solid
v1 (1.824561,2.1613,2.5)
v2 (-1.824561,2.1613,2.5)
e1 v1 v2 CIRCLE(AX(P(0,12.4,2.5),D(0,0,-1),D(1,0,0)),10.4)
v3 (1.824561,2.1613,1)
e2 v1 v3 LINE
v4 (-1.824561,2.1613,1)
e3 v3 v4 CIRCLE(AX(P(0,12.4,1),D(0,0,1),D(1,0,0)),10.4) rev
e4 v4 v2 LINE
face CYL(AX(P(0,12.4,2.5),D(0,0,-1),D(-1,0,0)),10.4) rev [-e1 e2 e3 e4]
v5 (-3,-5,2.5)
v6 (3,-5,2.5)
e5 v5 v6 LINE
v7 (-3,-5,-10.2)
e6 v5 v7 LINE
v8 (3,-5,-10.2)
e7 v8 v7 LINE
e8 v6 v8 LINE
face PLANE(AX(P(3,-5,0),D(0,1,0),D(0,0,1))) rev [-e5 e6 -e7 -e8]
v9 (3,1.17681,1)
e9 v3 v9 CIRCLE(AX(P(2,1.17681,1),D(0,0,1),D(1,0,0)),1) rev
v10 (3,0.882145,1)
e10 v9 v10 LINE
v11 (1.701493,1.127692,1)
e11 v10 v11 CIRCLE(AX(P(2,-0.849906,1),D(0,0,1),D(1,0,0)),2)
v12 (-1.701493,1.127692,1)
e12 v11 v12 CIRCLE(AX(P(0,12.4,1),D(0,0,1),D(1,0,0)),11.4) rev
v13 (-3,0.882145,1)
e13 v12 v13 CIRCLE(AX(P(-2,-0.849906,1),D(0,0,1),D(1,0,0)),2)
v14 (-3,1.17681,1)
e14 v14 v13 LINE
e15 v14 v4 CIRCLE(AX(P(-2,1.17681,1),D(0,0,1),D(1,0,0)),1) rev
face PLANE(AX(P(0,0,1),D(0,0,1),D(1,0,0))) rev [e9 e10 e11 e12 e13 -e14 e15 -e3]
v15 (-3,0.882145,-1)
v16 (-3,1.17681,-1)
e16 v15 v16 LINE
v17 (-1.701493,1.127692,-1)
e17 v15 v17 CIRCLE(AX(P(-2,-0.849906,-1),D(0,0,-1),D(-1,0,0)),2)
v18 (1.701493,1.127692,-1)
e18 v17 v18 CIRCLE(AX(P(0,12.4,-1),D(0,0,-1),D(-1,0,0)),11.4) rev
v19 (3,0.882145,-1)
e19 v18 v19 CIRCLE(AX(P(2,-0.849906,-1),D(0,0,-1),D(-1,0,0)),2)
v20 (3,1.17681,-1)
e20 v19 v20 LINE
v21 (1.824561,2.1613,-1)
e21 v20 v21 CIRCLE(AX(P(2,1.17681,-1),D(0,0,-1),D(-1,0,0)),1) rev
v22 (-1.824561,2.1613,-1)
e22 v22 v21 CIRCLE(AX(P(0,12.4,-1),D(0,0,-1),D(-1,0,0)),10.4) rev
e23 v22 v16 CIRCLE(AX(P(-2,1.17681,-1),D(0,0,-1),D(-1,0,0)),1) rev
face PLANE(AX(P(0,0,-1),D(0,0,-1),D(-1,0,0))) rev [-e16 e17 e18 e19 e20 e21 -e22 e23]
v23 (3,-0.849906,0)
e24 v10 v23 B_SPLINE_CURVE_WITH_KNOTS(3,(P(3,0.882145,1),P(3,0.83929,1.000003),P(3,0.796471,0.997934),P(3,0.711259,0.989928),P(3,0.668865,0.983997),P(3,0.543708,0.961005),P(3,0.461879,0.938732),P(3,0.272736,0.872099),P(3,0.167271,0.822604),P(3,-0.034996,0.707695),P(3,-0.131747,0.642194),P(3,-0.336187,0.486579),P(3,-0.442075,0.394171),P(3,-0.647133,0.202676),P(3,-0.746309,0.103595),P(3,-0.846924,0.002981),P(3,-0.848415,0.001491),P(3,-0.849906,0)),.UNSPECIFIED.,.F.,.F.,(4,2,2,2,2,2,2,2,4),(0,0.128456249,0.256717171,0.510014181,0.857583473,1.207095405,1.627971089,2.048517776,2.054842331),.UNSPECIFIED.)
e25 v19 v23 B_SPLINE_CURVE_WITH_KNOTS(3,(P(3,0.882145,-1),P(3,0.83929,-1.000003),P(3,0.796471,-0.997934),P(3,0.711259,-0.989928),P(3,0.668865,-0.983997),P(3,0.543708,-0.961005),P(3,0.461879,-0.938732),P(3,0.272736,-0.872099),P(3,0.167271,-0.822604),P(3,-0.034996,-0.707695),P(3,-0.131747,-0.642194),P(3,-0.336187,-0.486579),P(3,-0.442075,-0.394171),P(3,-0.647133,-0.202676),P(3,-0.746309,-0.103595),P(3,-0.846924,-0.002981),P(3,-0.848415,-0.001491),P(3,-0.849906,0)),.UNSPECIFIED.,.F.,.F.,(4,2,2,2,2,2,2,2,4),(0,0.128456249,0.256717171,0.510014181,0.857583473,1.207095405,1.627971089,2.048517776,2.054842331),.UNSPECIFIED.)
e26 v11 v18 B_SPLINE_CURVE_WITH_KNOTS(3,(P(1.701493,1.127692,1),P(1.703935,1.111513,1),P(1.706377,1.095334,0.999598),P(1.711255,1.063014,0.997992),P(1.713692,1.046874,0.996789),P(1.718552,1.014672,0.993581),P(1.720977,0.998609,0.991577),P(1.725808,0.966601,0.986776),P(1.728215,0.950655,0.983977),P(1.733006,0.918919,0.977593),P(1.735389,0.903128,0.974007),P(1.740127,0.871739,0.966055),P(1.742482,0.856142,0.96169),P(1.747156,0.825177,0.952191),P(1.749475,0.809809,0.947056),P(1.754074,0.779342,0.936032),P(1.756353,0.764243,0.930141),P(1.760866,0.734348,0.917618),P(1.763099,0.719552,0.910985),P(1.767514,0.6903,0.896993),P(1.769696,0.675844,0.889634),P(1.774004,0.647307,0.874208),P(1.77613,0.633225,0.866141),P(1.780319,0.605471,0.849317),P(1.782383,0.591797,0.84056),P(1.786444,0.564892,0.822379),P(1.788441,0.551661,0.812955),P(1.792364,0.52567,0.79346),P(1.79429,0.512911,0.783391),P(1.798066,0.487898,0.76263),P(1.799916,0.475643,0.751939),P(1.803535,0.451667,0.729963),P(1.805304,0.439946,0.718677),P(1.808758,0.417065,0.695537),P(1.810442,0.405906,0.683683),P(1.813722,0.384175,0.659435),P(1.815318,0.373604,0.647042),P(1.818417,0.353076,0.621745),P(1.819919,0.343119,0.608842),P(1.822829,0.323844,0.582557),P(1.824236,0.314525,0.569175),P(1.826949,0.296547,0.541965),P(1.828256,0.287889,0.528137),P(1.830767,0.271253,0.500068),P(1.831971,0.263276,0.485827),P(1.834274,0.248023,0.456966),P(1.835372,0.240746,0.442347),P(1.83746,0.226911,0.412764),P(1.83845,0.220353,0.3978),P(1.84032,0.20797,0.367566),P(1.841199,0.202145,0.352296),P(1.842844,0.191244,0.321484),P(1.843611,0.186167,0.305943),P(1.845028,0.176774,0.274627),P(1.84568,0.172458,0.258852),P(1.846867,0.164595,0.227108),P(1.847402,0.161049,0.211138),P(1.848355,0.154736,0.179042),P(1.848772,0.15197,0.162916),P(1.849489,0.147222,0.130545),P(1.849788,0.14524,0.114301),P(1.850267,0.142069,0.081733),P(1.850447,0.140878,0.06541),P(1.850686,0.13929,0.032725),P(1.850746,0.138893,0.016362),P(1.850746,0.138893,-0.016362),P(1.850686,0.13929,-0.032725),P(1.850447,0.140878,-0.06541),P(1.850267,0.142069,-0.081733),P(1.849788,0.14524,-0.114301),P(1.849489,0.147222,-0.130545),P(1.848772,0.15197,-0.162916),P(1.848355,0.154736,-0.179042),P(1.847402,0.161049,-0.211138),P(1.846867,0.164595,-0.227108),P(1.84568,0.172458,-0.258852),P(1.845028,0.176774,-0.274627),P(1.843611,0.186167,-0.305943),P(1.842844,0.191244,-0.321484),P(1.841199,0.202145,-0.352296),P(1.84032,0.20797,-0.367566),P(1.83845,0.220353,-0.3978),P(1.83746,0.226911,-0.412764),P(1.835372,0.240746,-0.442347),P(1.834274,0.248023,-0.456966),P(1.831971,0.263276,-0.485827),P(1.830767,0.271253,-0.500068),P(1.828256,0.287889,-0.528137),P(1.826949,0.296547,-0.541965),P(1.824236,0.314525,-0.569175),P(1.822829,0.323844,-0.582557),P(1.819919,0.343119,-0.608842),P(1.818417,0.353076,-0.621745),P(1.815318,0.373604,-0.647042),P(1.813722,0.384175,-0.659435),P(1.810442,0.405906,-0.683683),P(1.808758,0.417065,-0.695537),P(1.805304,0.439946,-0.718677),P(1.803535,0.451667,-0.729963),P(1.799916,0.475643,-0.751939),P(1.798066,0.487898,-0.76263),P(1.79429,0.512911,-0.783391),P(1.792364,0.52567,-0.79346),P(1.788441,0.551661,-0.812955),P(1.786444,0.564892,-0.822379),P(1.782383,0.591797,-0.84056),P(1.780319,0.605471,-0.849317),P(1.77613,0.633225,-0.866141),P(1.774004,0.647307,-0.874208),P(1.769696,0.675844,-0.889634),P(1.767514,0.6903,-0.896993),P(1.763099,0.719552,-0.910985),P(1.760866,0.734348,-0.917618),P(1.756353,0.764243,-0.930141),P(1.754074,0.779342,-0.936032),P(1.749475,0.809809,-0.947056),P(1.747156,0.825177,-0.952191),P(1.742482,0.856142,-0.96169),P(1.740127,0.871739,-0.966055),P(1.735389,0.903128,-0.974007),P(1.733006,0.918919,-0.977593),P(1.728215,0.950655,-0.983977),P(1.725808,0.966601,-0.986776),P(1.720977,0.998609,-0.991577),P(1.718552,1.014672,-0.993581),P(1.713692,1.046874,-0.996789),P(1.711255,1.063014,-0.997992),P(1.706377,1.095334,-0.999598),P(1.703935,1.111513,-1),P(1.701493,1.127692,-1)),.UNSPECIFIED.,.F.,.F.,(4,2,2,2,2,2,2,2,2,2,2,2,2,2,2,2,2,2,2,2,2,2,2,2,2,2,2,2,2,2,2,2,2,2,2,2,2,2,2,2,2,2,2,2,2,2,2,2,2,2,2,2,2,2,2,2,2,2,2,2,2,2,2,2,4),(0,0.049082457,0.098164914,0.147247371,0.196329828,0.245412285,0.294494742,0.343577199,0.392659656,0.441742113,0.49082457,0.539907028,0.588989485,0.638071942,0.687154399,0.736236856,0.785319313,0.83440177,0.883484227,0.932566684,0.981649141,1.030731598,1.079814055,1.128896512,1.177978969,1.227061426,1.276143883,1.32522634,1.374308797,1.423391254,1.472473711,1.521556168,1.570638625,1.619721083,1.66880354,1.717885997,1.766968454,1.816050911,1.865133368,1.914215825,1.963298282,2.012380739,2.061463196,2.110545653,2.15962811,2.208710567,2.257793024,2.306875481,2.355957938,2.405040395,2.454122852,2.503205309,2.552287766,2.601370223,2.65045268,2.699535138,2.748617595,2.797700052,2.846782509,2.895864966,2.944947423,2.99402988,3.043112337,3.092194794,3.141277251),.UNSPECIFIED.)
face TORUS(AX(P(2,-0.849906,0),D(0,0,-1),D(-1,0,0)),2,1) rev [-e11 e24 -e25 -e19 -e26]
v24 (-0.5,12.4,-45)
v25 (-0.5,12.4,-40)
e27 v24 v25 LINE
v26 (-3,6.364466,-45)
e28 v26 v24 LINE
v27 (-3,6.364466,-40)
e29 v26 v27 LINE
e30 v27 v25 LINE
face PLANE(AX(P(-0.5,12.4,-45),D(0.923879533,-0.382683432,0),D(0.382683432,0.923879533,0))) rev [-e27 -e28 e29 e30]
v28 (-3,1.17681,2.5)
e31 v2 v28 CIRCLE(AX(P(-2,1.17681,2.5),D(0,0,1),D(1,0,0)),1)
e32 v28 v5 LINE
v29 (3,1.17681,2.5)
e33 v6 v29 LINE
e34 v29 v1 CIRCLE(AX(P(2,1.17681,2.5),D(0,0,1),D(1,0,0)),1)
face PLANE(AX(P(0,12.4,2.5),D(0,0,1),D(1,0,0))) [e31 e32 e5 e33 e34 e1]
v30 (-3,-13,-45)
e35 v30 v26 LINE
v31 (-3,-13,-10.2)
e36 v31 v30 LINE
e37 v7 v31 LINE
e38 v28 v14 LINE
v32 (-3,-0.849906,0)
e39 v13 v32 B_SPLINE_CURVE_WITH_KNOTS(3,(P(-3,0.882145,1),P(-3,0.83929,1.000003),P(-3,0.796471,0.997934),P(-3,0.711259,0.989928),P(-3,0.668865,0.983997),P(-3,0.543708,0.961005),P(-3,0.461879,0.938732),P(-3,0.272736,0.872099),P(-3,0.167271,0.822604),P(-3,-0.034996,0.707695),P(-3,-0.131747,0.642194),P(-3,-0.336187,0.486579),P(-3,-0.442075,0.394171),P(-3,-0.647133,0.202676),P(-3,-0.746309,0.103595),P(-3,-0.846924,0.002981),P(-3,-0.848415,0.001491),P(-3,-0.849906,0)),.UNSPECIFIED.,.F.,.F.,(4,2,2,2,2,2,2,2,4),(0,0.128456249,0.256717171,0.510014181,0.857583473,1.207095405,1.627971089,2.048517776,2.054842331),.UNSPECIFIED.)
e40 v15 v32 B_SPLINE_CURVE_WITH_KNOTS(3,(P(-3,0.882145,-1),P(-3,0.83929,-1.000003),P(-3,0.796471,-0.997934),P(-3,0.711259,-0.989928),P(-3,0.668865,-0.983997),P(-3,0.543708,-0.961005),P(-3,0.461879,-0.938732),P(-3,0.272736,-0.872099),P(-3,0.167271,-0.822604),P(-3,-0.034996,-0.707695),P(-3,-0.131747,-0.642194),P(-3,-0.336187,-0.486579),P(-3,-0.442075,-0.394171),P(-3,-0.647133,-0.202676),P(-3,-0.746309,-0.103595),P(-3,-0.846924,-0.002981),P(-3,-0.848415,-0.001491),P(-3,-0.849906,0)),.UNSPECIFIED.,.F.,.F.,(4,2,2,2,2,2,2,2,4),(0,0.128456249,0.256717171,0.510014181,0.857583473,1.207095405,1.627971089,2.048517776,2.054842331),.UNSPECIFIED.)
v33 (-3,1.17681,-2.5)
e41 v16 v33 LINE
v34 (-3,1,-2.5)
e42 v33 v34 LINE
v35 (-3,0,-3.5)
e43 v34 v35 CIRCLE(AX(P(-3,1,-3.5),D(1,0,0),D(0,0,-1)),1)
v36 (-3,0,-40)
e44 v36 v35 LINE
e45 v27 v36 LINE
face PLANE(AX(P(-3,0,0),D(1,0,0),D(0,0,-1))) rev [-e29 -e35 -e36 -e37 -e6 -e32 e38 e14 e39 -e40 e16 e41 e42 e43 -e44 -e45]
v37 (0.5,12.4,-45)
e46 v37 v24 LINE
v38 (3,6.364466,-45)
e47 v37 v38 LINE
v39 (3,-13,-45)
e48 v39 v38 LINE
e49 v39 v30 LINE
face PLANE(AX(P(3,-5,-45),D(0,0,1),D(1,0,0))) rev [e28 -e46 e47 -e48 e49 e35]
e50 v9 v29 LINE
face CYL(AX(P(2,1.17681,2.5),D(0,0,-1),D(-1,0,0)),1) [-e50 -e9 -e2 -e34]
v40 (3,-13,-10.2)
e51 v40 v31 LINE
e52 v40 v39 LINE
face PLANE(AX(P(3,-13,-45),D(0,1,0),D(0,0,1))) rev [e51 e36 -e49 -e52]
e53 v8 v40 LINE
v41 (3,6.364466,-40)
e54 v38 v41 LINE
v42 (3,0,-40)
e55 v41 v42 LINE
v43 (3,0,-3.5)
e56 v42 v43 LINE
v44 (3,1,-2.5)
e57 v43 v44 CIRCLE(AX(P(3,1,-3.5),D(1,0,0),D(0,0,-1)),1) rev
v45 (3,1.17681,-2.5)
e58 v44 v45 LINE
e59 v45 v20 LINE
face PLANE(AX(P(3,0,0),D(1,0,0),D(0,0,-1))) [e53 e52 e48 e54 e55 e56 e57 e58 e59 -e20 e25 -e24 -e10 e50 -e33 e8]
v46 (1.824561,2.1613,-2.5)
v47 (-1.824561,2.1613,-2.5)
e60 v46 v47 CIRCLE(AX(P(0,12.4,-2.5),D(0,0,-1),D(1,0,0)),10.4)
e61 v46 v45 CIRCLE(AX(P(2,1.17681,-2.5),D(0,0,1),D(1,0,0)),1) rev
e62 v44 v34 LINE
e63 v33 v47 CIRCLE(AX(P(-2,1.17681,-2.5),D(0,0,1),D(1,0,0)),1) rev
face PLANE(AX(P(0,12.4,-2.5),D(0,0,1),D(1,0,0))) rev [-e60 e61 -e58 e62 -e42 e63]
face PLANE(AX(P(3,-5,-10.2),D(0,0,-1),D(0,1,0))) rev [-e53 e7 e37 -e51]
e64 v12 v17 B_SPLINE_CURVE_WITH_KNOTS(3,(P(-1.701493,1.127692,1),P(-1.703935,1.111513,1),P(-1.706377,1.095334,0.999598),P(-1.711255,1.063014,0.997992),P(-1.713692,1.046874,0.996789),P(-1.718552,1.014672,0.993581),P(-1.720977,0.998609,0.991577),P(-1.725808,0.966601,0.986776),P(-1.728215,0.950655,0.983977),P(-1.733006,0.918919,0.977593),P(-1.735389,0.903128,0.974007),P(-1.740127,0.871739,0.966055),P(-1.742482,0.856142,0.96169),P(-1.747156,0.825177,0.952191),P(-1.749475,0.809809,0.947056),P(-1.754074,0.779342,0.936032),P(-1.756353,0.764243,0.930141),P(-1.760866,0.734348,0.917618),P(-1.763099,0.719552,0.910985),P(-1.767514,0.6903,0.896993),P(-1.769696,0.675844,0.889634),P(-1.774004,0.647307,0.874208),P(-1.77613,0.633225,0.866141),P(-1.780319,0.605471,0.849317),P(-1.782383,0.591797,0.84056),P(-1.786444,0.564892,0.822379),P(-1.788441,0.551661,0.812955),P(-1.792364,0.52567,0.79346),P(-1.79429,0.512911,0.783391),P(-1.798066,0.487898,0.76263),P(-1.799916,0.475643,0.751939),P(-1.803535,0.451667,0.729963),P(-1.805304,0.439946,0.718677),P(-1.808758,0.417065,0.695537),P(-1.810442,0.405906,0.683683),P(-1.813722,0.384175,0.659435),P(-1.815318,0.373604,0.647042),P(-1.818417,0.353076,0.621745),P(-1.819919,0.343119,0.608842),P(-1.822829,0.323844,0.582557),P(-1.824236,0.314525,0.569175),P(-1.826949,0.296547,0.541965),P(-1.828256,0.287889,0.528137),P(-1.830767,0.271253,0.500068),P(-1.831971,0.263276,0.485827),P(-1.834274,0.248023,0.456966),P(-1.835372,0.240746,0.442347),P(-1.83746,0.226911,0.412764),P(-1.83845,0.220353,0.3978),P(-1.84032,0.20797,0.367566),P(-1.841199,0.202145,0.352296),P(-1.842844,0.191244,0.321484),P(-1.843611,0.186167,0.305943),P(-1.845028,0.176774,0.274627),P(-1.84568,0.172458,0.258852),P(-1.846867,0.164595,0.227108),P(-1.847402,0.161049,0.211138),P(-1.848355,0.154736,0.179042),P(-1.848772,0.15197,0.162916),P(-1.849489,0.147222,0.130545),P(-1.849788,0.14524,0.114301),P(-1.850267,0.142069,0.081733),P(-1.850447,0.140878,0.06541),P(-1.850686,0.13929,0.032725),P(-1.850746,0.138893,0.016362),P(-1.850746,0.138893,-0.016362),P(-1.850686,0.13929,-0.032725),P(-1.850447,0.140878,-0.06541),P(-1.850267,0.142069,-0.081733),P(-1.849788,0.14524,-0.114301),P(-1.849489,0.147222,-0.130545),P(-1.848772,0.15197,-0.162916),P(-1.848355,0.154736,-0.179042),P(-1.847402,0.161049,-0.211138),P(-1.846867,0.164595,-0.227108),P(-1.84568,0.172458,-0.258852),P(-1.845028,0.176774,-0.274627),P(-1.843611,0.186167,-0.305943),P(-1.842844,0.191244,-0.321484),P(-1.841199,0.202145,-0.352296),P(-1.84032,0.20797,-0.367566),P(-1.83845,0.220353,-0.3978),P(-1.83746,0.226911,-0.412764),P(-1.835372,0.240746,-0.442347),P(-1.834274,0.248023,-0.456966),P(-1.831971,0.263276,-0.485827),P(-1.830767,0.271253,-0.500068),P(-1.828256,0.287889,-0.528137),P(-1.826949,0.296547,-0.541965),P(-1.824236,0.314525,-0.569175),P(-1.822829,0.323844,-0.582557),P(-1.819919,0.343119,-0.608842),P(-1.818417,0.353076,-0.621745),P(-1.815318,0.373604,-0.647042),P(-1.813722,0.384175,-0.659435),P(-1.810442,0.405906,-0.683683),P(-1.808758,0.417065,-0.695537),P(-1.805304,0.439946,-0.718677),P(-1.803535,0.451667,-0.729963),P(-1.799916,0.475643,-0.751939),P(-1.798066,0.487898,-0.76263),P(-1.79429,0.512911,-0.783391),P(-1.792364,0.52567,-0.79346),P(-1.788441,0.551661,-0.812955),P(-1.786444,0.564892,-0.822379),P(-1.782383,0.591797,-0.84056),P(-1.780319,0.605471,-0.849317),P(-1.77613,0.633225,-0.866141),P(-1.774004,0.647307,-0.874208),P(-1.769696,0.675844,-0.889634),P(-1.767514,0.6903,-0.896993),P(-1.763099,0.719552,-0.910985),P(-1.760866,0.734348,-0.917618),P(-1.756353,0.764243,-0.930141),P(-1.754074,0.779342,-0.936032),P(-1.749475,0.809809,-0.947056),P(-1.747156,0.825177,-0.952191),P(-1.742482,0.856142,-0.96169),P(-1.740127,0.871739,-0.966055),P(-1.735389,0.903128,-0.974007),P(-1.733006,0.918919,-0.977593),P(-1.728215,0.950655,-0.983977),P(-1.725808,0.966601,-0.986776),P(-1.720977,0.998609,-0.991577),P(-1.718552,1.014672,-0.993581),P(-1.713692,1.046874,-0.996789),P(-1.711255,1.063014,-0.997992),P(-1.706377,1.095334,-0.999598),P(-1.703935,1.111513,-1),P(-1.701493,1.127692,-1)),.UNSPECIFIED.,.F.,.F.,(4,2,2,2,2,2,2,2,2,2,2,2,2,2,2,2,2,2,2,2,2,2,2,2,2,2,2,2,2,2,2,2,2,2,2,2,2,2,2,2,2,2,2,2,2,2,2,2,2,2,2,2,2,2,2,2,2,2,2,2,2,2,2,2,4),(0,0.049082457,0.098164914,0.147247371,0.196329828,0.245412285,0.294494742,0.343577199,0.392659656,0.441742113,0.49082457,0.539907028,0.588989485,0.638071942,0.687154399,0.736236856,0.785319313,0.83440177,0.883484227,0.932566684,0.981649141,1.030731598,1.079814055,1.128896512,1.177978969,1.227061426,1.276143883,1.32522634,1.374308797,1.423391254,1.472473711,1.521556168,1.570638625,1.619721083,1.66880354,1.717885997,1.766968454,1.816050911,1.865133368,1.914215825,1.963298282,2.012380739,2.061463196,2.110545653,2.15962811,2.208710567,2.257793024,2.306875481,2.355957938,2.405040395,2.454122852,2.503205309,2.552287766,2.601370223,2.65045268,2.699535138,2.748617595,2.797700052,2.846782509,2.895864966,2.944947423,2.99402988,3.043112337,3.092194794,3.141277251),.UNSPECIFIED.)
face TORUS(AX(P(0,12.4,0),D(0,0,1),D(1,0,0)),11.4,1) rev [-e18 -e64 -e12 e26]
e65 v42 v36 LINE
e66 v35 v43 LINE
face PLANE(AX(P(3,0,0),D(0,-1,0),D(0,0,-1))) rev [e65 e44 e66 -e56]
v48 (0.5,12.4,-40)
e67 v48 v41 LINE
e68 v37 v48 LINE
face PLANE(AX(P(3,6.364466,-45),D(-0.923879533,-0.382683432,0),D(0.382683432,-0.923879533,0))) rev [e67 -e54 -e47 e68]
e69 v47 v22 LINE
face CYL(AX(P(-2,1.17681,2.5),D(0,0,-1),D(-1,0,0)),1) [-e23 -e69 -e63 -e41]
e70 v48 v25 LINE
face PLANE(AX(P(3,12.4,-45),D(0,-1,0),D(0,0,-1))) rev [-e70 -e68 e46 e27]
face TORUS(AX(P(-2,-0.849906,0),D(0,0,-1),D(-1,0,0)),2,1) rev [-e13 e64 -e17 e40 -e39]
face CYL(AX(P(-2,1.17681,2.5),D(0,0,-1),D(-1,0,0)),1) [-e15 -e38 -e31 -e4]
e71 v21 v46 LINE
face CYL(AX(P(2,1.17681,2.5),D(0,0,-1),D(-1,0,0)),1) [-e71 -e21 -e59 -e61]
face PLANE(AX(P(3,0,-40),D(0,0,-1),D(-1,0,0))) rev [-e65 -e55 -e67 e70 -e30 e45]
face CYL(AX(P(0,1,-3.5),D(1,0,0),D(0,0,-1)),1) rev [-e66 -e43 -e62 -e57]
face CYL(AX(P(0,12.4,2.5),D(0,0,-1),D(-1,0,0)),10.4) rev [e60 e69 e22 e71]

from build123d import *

# Parameters (mm, degrees)
BOSS_EXTRUDE1_DEPTH = 3
BOSS_EXTRUDE2_DEPTH = 2.5
SKETCH4_W           = 2
SKETCH4_H           = 2.442088572
FILLET1_R           = 1
FILLET2_R           = 1
CUT_EXTRUDE2_DEPTH  = 5
SKETCH6_W           = 34.8
SKETCH6_H           = 8
BOSS_EXTRUDE3_DEPTH = 3


with BuildPart() as part:
    # Sketch2 → Boss-Extrude1 (new, symmetric)
    with BuildSketch(Plane(origin=(0, 0, 0), x_dir=(0, 0, -1), z_dir=(1, 0, 0))):
        Polygon((0, 0), (40, 0), (40, 12.4), (45, 12.4), (45, -5), (0, -5), align=None)
    extrude(amount=BOSS_EXTRUDE1_DEPTH, both=True)

    # Sketch3 → Boss-Extrude2 (add, symmetric)
    with BuildSketch(Plane.XY):
        with BuildLine():
            Line((-3, 2.442088572), (-3, -5))
            Line((-3, -5), (3, -5))
            Line((3, -5), (3, 2.442088572))
            ThreePointArc((3, 2.442088572), (0, 2), (-3, 2.442088572))
        make_face()
    extrude(amount=BOSS_EXTRUDE2_DEPTH, both=True)

    # Sketch4 → Cut-Revolve1 (revolve, cut)
    with BuildSketch(Plane(origin=(0, 0, 0), x_dir=(0, 0, -1), z_dir=(1, 0, 0))):
        with Locations((0, 1.221044286)):
            Rectangle(SKETCH4_W, SKETCH4_H)
    revolve(axis=Axis((0, 12.4, 0), (0, 0, -1)), mode=Mode.SUBTRACT)

    # Fillet1
    fillet1_edges = [part.edges().sort_by_distance(p)[0] for p in [
        (-3, 2.442088572, 1.75),
        (0, 0, -2.5),
        (3, 2.442088572, 1.75),
        (-3, 2.442088572, -1.75),
        (3, 2.442088572, -1.75),
        (-3, 0.368375006, 0),
        (3, 0.368375006, 0),
    ]]
    fillet(fillet1_edges, radius=FILLET1_R)

    # Fillet2
    # the kernel refuses this fillet: 1 mm, written as the material it adds along each edge
    with BuildSketch(Plane(origin=(0, 12.4, -1), x_dir=(-0.14925373134328332, -0.9887989298538439, 0), z_dir=(-0.9887989298538439, 0.14925373134328332, 0))) as fillet2_piece_1:
        with BuildLine():
            CenterArc((12.4 - FILLET2_R, FILLET2_R), FILLET2_R, 270, 90)
            Line((12.4 - FILLET2_R, 0), (12.4, 0))
            Line((12.4, 0), (12.4, FILLET2_R))
        make_face()
    revolve(axis=Axis((0, 12.4, -1), (0, 0, 1)), revolution_arc=17.167363371)
    with BuildSketch(Plane(origin=(0, 12.4, 1), x_dir=(-0.14925373134328332, -0.9887989298538439, 0), z_dir=(-0.9887989298538439, 0.14925373134328332, 0))) as fillet2_piece_2:
        with BuildLine():
            CenterArc((12.4 - FILLET2_R, -FILLET2_R), FILLET2_R, 0, 90)
            Line((12.4 - FILLET2_R, 0), (12.4, 0))
            Line((12.4, 0), (12.4, -FILLET2_R))
        make_face()
    revolve(axis=Axis((0, 12.4, 1), (0, 0, 1)), revolution_arc=17.167363371)
    with BuildSketch(Plane(origin=(2, -0.84990566, -1), x_dir=(-0.8018642143213413, -0.5975063027205807, 0), z_dir=(-0.5975063027205807, 0.8018642143213413, 0))) as fillet2_piece_3_section:
        with BuildLine():
            CenterArc((1 + FILLET2_R, FILLET2_R), FILLET2_R, 180, 90)
            Line((1, FILLET2_R), (1, 0))
            Line((1, 0), (1 + FILLET2_R, 0))
        make_face()
    fillet2_piece_3 = revolve(axis=Axis((2, -0.84990566, -1), (0, 0, 1)), revolution_arc=241.892173959, mode=Mode.PRIVATE)
    fillet2_piece_3 = split(fillet2_piece_3, bisect_by=Plane(origin=(3, -0.02635607, -0.708719326), z_dir=(-1, 0, 0)), keep=Keep.TOP, mode=Mode.PRIVATE)
    add(fillet2_piece_3)
    with BuildSketch(Plane(origin=(2, -0.84990566, 1), x_dir=(-0.8018642143213406, -0.5975063027205816, 0), z_dir=(-0.5975063027205816, 0.8018642143213406, 0))) as fillet2_piece_4_section:
        with BuildLine():
            CenterArc((1 + FILLET2_R, -FILLET2_R), FILLET2_R, 90, 90)
            Line((1 + FILLET2_R, 0), (1, 0))
            Line((1, 0), (1, -FILLET2_R))
        make_face()
    fillet2_piece_4 = revolve(axis=Axis((2, -0.84990566, 1), (0, 0, 1)), revolution_arc=241.892173959, mode=Mode.PRIVATE)
    fillet2_piece_4 = split(fillet2_piece_4, bisect_by=Plane(origin=(3, -0.026356063, 0.70871933), z_dir=(-1, 0, 0)), keep=Keep.TOP, mode=Mode.PRIVATE)
    add(fillet2_piece_4)
    with BuildSketch(Plane(origin=(-2, -0.84990566, -1), x_dir=(0.8018642143213416, -0.5975063027205804, 0), z_dir=(0.5975063027205804, 0.8018642143213416, 0))) as fillet2_piece_5_section:
        with BuildLine():
            CenterArc((1 + FILLET2_R, -FILLET2_R), FILLET2_R, 90, 90)
            Line((1 + FILLET2_R, 0), (1, 0))
            Line((1, 0), (1, -FILLET2_R))
        make_face()
    fillet2_piece_5 = revolve(axis=Axis((-2, -0.84990566, -1), (0, 0, -1)), revolution_arc=241.892173959, mode=Mode.PRIVATE)
    fillet2_piece_5 = split(fillet2_piece_5, bisect_by=Plane(origin=(-3, -0.026356035, -0.70871925), z_dir=(1, 0, 0)), keep=Keep.TOP, mode=Mode.PRIVATE)
    add(fillet2_piece_5)
    with BuildSketch(Plane(origin=(-2, -0.84990566, 1), x_dir=(0.8018642143213416, -0.5975063027205804, 0), z_dir=(0.5975063027205804, 0.8018642143213416, 0))) as fillet2_piece_6_section:
        with BuildLine():
            CenterArc((1 + FILLET2_R, FILLET2_R), FILLET2_R, 180, 90)
            Line((1 + FILLET2_R, 0), (1, 0))
            Line((1, 0), (1, FILLET2_R))
        make_face()
    fillet2_piece_6 = revolve(axis=Axis((-2, -0.84990566, 1), (0, 0, -1)), revolution_arc=241.892173959, mode=Mode.PRIVATE)
    fillet2_piece_6 = split(fillet2_piece_6, bisect_by=Plane(origin=(-3, -0.026356028, 0.708719255), z_dir=(1, 0, 0)), keep=Keep.TOP, mode=Mode.PRIVATE)
    add(fillet2_piece_6)

    # Sketch5 → Cut-Extrude2 (cut)
    with BuildSketch(Plane.XY.offset(-40)):
        Polygon((3, 6.364466094), (0.5, 12.4), (3, 12.4), align=None)
        Polygon((-0.5, 12.4), (-3, 6.364466094), (-3, 12.4), align=None)
    extrude(amount=-CUT_EXTRUDE2_DEPTH, mode=Mode.SUBTRACT)

    # Sketch6 → Boss-Extrude3 (add, symmetric)
    with BuildSketch(Plane(origin=(0, 0, 0), x_dir=(0, 0, -1), z_dir=(1, 0, 0))):
        with Locations((27.6, -9)):
            Rectangle(SKETCH6_W, SKETCH6_H)
    extrude(amount=BOSS_EXTRUDE3_DEPTH, both=True)


solid = part.part
